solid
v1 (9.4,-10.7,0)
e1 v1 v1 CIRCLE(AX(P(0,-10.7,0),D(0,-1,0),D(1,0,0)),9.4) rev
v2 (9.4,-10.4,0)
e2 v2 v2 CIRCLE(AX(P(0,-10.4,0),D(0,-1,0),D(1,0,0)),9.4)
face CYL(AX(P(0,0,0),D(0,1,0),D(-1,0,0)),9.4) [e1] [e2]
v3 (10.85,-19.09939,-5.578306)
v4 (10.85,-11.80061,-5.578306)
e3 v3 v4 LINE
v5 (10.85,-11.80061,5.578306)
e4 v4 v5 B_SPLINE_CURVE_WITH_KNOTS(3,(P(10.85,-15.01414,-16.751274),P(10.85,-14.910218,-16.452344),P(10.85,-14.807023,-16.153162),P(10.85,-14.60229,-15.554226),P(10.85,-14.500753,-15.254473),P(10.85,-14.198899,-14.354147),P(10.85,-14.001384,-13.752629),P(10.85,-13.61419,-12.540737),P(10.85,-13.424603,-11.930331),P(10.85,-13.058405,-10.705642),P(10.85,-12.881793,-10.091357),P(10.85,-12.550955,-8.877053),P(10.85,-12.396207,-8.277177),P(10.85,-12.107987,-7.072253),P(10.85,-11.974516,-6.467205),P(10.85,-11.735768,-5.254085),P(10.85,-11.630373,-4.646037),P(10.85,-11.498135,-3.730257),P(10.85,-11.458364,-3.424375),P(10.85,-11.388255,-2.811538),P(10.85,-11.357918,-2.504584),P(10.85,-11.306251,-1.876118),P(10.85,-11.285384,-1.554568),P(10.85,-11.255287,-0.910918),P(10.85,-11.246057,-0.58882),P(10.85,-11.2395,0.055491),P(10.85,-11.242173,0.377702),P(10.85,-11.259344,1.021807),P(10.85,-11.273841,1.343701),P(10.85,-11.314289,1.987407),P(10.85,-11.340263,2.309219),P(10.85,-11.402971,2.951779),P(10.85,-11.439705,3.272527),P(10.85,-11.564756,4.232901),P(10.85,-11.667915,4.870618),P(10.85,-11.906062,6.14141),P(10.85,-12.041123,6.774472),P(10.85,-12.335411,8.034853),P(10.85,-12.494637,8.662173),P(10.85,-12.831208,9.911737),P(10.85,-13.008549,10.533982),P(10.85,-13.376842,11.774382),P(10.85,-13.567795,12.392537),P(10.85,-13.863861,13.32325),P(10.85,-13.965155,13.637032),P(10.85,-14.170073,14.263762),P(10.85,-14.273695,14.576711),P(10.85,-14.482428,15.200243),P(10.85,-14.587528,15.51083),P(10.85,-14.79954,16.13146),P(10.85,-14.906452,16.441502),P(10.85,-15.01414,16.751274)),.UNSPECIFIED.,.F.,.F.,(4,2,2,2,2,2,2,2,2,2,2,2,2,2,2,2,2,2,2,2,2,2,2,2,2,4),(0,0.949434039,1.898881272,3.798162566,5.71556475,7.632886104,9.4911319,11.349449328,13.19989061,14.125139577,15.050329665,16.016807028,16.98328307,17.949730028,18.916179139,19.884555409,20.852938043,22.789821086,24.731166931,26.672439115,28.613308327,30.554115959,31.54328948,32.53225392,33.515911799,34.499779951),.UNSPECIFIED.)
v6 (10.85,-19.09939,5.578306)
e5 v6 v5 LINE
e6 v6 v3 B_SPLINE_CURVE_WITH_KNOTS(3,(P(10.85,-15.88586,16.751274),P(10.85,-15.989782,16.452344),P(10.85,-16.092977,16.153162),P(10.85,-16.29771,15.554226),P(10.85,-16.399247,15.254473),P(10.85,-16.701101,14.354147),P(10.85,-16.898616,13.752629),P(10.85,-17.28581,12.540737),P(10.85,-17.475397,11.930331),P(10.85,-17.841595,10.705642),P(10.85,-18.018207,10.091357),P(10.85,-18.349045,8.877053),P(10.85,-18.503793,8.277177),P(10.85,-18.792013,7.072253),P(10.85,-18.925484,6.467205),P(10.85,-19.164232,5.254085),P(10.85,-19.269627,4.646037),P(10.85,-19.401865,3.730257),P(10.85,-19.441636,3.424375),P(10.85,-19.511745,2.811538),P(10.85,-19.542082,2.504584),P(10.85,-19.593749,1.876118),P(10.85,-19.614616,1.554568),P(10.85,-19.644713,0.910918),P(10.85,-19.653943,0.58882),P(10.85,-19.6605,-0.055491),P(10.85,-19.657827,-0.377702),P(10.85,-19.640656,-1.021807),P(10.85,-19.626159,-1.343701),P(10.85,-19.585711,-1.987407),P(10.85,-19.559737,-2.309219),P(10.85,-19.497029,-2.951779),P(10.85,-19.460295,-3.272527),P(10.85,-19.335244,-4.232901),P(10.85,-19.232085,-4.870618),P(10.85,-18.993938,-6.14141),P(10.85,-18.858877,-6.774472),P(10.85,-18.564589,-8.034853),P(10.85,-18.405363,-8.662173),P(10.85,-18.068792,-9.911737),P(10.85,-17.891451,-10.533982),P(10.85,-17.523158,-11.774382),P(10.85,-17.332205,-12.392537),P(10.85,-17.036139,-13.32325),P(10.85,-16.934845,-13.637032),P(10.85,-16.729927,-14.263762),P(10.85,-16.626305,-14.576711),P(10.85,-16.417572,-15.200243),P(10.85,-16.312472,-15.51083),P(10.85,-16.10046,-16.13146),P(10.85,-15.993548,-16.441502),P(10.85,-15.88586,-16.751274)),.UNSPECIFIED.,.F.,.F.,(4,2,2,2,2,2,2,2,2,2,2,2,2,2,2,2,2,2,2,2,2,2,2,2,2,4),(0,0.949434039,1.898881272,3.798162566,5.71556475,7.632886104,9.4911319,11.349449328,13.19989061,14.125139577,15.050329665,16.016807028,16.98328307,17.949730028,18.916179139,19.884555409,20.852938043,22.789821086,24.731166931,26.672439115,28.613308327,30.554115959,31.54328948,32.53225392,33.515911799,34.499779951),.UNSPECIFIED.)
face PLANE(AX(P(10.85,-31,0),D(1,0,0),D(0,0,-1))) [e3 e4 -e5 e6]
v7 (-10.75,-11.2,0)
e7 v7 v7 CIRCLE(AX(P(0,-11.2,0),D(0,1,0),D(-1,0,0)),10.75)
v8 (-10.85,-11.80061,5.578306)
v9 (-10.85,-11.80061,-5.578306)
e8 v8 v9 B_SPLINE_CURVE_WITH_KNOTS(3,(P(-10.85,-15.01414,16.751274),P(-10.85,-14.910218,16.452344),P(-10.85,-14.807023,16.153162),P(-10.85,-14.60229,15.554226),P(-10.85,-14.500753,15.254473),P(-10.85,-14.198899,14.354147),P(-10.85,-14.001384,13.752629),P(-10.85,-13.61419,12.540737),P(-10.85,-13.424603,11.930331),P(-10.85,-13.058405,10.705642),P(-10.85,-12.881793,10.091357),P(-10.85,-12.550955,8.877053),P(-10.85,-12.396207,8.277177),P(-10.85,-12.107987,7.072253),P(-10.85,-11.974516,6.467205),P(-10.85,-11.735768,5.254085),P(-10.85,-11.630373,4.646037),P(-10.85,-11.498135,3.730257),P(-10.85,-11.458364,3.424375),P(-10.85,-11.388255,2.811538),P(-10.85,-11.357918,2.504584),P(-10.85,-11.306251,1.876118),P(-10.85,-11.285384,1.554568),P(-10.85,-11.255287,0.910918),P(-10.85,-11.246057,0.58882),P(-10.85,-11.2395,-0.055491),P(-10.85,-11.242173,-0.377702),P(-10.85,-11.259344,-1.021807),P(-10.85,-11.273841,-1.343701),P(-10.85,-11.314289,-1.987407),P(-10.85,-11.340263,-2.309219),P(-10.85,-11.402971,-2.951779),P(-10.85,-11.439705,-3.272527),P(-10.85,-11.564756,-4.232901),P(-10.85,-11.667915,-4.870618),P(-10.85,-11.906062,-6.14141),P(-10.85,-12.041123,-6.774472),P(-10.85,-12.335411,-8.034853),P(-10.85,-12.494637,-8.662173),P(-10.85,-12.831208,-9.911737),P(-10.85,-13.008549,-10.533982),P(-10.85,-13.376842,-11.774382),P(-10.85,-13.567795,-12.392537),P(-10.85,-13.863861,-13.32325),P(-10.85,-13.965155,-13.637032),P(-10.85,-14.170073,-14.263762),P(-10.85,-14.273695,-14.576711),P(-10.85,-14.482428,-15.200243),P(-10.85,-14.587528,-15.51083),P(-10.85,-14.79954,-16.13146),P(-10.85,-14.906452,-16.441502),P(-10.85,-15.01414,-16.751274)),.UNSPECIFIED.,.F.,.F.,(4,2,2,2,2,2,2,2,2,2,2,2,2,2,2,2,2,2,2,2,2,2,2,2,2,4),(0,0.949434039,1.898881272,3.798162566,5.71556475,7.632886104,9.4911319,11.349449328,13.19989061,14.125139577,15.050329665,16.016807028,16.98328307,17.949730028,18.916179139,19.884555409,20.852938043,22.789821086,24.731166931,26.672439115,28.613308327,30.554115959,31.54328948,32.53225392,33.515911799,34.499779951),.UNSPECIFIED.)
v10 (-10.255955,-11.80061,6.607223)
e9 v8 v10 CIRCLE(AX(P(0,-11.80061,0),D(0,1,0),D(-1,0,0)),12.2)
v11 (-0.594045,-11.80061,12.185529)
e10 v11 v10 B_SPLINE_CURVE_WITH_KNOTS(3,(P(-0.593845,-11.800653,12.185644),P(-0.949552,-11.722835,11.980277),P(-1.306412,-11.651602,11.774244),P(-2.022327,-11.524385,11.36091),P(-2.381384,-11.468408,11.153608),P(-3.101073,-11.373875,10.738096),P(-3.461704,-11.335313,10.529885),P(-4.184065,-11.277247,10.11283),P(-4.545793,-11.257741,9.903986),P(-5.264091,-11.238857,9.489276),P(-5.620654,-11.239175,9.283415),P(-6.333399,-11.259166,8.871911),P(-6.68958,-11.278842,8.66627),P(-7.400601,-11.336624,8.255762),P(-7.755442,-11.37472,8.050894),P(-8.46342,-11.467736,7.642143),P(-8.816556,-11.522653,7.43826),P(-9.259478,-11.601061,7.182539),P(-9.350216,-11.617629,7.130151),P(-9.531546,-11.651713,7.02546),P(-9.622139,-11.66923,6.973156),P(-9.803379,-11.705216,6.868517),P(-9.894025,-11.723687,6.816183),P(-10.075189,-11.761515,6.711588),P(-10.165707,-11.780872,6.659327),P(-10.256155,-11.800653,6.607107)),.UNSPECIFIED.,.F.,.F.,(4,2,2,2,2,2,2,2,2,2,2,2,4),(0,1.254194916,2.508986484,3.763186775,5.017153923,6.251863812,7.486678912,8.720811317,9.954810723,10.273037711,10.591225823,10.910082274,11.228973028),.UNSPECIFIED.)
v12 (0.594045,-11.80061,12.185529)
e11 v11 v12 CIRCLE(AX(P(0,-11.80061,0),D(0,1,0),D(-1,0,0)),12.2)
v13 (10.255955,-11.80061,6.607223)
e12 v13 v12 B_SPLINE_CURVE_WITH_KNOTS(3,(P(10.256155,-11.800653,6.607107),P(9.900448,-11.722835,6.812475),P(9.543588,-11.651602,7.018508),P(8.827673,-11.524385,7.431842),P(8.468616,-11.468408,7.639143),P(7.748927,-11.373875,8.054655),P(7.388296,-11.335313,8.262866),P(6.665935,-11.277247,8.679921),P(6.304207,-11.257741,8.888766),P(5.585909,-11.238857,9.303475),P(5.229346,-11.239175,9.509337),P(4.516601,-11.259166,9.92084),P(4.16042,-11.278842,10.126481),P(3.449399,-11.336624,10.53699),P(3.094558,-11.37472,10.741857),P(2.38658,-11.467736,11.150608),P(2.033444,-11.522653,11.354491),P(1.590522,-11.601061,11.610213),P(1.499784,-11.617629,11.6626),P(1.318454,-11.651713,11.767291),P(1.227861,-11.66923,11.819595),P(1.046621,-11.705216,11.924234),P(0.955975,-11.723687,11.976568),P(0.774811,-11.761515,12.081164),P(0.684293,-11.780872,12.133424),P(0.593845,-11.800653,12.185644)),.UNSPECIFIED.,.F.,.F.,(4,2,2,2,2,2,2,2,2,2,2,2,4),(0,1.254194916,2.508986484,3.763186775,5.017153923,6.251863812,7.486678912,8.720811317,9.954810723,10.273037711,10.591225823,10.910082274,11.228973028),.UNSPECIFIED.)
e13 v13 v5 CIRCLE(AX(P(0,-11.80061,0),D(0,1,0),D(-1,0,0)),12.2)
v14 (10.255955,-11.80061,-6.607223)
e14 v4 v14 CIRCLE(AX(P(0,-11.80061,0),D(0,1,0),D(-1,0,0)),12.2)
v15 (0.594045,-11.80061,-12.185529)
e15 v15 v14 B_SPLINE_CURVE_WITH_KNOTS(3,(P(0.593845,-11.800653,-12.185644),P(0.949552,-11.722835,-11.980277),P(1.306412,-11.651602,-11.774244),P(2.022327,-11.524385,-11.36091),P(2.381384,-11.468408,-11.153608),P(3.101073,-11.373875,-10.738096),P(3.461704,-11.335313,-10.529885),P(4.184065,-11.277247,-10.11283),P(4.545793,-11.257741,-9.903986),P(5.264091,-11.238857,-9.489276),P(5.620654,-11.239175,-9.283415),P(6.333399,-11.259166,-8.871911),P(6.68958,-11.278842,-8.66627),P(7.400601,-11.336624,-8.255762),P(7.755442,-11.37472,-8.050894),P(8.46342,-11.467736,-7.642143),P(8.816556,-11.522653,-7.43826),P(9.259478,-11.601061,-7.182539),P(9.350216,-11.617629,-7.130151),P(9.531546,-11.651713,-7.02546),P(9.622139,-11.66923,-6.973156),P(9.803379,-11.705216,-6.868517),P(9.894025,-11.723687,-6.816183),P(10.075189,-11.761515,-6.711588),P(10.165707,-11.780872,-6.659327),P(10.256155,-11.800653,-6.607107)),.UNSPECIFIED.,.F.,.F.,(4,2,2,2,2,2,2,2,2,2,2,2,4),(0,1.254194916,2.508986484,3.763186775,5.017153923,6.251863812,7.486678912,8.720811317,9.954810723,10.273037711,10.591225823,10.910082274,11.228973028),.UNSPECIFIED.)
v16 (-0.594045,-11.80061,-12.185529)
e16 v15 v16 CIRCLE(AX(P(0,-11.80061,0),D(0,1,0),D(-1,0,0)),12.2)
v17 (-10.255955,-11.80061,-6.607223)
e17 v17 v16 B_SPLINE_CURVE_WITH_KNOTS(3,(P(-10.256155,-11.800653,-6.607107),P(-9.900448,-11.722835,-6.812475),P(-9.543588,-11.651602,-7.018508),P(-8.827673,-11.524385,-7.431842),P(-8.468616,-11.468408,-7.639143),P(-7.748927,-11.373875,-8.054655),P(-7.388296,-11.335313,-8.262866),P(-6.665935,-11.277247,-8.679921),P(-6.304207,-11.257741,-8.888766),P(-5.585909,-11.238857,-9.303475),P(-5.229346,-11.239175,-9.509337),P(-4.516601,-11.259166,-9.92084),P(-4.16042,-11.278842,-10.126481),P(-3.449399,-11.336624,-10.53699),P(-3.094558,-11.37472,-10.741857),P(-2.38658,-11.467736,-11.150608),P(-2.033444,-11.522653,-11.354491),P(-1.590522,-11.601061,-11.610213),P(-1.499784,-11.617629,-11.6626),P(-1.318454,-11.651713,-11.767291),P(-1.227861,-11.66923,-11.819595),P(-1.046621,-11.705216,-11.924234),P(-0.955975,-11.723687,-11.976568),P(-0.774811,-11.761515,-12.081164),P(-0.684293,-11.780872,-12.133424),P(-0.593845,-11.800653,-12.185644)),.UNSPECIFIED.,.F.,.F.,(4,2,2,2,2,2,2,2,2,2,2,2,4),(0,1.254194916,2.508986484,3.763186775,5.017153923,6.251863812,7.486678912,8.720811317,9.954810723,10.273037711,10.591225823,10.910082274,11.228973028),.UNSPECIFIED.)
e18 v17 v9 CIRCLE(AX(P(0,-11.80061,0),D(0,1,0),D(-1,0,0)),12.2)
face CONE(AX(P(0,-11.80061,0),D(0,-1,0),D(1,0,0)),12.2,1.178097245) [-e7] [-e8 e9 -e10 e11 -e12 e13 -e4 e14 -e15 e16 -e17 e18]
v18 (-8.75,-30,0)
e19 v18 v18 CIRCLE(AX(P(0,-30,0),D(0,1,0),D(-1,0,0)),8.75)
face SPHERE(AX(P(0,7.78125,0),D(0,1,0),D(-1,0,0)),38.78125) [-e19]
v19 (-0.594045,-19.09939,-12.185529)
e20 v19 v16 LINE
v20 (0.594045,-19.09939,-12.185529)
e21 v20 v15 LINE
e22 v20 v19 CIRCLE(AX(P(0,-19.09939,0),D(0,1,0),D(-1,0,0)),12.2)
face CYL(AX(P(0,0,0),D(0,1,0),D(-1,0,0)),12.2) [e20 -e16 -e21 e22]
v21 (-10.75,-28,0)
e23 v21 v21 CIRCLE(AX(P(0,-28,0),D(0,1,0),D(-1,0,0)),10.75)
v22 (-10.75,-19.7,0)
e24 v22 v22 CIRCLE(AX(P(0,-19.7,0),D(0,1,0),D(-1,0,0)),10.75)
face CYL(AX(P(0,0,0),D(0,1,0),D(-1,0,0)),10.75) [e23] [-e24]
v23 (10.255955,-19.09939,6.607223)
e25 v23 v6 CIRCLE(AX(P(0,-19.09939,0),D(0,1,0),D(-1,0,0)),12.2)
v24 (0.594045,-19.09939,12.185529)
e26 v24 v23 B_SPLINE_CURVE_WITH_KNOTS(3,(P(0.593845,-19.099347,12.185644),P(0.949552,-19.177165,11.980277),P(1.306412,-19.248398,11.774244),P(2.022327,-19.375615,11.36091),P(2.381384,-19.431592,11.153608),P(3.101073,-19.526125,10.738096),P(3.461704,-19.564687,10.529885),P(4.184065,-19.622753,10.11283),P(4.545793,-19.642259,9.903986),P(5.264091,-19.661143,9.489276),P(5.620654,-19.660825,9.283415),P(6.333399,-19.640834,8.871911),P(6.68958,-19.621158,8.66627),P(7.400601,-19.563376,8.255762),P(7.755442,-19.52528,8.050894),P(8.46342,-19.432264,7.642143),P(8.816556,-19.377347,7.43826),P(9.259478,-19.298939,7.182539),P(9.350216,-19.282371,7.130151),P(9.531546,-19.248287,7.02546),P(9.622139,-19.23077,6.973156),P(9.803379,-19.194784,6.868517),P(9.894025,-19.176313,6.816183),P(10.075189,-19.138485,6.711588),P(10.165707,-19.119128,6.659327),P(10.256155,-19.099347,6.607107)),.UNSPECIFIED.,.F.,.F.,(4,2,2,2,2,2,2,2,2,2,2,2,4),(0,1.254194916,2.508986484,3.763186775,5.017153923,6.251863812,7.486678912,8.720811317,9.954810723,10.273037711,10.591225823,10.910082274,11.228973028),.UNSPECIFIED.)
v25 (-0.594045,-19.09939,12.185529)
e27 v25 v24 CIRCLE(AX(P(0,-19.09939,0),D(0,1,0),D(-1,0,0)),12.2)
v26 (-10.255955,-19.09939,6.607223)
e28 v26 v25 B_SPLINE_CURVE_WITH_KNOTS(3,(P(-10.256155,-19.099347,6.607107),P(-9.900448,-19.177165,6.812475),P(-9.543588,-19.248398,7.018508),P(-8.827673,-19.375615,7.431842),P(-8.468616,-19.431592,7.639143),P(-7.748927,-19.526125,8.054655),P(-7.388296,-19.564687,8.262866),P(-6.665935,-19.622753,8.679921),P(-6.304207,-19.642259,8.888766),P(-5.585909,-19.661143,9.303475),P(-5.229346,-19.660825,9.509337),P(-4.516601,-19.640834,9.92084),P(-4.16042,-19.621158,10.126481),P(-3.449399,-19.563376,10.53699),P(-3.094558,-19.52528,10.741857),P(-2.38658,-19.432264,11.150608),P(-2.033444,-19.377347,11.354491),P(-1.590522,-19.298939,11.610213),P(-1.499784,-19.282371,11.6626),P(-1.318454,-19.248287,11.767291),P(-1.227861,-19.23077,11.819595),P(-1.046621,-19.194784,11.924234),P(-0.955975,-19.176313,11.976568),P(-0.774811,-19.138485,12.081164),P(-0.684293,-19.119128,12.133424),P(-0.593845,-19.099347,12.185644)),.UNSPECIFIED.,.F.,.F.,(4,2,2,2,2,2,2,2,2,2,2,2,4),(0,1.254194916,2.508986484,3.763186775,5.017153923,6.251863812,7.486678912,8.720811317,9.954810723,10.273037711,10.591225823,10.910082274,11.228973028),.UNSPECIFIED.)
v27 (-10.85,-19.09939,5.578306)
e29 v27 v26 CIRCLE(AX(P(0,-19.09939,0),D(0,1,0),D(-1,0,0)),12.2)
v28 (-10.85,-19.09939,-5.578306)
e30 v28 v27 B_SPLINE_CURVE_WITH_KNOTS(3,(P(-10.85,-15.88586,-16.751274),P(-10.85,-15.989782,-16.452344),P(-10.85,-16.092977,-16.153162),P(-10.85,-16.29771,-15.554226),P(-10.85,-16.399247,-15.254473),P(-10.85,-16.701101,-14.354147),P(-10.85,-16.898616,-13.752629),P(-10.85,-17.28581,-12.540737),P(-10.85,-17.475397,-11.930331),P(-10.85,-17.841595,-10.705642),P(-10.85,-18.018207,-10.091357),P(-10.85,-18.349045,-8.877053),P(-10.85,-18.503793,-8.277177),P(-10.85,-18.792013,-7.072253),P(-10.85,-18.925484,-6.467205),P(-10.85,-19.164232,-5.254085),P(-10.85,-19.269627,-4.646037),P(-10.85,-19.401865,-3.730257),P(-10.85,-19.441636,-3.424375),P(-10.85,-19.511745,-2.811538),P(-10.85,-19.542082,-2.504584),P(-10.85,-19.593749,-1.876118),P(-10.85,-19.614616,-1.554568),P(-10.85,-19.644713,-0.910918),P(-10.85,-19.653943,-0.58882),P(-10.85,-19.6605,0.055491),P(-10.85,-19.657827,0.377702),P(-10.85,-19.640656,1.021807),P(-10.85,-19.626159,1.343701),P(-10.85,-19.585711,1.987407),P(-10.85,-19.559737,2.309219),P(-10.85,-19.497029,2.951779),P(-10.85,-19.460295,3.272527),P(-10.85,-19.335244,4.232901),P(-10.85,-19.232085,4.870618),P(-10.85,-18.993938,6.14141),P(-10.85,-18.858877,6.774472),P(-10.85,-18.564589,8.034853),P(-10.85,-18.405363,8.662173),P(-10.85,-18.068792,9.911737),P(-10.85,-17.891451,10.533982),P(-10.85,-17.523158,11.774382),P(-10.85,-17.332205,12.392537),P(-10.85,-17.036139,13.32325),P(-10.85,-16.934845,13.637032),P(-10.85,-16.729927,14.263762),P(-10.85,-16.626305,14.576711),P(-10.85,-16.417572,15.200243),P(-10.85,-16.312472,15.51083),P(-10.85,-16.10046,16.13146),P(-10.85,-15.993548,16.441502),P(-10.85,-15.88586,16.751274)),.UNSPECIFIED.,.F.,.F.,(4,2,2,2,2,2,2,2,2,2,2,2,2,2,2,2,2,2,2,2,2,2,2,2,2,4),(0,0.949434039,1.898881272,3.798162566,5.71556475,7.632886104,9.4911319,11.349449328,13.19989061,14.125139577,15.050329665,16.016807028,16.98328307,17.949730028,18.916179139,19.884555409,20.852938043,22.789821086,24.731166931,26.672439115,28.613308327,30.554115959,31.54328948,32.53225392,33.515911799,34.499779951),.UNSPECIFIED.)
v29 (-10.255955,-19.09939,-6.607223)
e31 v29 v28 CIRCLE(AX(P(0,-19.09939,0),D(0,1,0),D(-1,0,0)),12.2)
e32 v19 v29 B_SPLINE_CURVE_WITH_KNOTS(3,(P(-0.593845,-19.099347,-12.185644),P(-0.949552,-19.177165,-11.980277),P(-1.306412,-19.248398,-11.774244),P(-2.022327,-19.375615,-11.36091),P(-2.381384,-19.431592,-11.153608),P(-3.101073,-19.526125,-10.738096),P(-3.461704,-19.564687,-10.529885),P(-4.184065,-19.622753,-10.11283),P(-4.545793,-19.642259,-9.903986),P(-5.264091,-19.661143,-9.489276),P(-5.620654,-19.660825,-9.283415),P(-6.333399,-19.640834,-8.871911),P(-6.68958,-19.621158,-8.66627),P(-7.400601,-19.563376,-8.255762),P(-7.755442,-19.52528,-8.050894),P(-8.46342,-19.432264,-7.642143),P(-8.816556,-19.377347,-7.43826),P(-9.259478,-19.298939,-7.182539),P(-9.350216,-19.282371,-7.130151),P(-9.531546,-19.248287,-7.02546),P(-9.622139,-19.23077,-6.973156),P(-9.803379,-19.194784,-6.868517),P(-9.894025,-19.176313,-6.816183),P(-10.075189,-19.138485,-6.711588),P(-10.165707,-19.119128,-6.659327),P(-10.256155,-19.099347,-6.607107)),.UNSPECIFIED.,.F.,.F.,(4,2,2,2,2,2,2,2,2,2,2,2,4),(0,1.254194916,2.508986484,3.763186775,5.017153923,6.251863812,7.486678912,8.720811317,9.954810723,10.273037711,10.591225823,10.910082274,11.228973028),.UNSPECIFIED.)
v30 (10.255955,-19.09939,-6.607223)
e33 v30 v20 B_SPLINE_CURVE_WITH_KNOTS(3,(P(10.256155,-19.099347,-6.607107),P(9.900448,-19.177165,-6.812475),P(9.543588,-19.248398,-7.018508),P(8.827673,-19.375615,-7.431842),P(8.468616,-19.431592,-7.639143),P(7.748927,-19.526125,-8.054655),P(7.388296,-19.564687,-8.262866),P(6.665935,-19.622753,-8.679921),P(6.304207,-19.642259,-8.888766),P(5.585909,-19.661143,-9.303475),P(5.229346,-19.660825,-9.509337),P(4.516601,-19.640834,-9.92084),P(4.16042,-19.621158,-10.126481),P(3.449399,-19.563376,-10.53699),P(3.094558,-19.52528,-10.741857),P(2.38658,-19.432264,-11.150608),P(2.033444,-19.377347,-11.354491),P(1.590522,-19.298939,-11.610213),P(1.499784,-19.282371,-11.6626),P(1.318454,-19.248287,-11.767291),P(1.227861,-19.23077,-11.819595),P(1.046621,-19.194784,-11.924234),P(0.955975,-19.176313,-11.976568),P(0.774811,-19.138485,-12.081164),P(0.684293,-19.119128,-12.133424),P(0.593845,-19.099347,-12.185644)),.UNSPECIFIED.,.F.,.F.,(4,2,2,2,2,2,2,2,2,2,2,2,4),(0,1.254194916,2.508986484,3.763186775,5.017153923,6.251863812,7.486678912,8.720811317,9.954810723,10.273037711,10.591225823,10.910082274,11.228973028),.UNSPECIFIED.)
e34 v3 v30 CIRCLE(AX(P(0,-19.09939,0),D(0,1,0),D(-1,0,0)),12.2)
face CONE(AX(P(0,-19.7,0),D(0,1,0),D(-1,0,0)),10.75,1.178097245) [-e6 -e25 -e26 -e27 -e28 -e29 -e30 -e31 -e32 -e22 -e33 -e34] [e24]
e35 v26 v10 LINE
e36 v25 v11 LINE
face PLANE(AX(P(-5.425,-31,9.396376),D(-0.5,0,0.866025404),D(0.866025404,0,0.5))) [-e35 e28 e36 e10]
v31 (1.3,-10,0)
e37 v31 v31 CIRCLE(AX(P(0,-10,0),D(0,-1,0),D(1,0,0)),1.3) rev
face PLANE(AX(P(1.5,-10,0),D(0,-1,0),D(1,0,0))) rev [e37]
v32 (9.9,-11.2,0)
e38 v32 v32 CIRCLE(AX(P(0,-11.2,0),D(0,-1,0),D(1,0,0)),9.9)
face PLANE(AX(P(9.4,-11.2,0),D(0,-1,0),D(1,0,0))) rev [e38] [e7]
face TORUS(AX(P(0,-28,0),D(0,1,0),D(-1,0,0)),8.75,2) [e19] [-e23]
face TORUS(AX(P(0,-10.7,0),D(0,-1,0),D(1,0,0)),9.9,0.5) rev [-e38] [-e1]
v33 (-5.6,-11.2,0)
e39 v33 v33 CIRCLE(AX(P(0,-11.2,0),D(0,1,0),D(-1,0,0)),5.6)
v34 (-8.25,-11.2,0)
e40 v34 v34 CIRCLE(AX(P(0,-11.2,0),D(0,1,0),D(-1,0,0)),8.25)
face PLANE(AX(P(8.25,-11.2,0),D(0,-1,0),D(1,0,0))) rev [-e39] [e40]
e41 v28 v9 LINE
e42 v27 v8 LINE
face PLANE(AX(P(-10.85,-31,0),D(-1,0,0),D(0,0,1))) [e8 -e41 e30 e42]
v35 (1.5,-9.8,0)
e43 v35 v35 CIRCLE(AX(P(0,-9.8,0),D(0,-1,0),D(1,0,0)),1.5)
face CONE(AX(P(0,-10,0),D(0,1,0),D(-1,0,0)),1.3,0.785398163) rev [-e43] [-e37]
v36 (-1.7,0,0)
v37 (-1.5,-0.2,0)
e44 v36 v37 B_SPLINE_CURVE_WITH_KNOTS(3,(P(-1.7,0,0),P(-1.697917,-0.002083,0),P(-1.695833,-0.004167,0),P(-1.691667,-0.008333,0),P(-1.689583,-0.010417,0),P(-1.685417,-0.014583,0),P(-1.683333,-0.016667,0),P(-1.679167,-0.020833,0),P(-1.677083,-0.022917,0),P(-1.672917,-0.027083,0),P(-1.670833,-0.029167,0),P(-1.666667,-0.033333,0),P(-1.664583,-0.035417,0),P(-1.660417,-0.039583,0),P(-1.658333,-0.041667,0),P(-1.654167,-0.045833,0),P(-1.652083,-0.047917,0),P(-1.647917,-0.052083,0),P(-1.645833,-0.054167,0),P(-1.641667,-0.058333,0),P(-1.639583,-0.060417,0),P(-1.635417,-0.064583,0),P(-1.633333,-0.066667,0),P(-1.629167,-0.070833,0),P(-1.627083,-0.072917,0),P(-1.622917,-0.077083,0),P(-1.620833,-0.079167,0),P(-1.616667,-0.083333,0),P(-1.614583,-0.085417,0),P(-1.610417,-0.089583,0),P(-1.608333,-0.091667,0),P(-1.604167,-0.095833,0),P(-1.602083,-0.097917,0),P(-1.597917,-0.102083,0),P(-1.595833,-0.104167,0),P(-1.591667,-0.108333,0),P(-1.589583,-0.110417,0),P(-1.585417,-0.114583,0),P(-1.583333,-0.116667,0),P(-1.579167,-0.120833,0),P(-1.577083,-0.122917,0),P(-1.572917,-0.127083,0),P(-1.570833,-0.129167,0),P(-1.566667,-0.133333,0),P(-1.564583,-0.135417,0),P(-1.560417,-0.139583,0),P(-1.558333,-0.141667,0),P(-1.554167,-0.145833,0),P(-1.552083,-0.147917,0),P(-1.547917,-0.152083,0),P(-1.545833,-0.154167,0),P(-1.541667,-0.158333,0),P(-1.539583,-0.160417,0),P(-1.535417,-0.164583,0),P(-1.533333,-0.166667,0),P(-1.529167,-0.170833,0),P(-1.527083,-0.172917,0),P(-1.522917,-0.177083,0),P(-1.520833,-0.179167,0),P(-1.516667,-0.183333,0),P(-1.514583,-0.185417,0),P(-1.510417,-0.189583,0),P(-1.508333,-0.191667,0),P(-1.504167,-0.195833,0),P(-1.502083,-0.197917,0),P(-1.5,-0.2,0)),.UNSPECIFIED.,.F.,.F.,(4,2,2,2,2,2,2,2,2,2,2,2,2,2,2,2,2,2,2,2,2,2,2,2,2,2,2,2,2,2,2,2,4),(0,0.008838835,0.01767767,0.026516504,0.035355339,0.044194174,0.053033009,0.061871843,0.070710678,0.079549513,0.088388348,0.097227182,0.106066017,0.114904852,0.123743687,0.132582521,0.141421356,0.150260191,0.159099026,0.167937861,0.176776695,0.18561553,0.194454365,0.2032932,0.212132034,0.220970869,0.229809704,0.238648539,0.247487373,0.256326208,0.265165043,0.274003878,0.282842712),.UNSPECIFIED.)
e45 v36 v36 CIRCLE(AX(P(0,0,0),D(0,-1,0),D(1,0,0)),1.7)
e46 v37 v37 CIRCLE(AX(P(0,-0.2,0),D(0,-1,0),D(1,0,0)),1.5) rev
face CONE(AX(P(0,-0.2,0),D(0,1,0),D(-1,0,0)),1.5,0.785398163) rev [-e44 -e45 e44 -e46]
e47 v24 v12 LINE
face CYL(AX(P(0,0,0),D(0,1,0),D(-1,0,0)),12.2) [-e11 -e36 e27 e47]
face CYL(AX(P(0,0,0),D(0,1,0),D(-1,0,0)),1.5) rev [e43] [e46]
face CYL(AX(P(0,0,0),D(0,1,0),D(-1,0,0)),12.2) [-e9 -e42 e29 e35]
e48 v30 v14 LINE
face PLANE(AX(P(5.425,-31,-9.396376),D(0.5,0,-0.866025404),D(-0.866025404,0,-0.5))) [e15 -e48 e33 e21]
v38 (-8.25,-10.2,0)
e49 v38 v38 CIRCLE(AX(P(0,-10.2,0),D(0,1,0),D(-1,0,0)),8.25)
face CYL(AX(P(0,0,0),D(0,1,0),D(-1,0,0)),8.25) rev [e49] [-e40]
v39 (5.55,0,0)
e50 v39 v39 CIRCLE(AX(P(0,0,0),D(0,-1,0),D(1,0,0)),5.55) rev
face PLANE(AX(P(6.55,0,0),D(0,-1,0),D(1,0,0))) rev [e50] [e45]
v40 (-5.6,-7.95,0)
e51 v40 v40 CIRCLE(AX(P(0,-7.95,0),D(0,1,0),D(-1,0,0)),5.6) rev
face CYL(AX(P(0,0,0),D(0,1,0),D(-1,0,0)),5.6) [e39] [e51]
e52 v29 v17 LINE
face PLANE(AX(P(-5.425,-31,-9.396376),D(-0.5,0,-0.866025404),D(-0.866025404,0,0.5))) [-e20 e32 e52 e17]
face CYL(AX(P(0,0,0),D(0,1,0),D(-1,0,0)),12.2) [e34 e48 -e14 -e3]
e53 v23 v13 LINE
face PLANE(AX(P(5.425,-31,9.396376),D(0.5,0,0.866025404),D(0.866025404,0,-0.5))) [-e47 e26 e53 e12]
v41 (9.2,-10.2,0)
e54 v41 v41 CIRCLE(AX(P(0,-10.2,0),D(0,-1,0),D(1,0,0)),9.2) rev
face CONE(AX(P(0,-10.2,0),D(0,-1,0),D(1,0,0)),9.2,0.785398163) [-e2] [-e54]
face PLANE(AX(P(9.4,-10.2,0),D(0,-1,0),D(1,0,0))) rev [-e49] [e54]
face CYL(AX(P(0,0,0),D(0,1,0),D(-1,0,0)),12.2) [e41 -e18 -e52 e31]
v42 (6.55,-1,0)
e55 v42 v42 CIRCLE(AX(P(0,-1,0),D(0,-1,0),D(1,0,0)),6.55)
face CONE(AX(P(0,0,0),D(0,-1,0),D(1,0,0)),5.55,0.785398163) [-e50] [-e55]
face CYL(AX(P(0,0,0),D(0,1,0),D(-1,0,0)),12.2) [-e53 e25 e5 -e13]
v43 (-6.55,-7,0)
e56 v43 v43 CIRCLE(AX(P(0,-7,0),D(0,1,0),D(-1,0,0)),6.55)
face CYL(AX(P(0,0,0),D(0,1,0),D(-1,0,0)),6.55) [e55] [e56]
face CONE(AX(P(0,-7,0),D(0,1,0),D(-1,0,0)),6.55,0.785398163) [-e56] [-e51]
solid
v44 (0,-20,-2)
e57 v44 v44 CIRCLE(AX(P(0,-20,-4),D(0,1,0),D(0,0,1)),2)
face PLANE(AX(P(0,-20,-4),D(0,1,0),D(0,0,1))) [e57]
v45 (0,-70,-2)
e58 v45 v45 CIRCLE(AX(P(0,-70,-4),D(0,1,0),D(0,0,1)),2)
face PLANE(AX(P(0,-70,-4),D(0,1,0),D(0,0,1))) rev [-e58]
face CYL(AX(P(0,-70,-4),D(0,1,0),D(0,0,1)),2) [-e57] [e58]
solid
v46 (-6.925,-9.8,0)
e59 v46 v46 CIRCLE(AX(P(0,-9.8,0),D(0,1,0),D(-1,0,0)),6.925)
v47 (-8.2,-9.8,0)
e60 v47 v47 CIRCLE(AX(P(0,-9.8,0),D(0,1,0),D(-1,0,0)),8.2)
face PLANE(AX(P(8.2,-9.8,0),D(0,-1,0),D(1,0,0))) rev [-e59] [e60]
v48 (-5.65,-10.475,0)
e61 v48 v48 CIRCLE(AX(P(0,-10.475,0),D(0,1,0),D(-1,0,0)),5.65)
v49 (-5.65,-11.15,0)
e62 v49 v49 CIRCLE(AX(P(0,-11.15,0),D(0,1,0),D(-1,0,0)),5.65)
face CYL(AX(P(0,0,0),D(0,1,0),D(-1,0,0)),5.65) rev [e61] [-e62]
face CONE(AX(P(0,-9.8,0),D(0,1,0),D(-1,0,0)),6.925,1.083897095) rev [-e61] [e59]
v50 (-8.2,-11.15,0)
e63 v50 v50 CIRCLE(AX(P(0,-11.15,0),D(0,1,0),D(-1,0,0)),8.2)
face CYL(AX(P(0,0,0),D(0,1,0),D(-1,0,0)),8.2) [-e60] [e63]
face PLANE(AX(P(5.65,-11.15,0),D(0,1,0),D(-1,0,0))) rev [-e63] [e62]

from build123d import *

# Parameters (mm, degrees)
CUT_EXTRUDE2_DEPTH  = 36.477880433
FILLET1_R           = 2
CHAMFER1_SIZE       = 1
CHAMFER2_SIZE       = 0.2
FILLET2_R           = 0.5
BOSS_EXTRUDE1_START = -20
SKETCH5_R           = 2
BOSS_EXTRUDE1_DEPTH = 50


# Some blends are built 0.0001 mm under size
with BuildPart() as part:
    # Sketch1 → Revolve1 (revolve)
    with BuildSketch(Plane.XY, mode=Mode.PRIVATE) as revolve1_sk:
        with BuildLine():
            Line((10.75, -30), (10.75, -19.7))
            Line((10.75, -19.7), (12.2, -19.099390335))
            Line((12.2, -19.099390335), (12.2, -11.800609665))
            Line((12.2, -11.800609665), (10.75, -11.2))
            Line((10.75, -11.2), (9.4, -11.2))
            Line((9.4, -11.2), (9.4, -10.2))
            Line((9.4, -10.2), (8.25, -10.2))
            Line((8.25, -10.2), (8.25, -11.2))
            Line((8.25, -11.2), (5.6, -11.2))
            Line((5.6, -11.2), (5.6, -8))
            Line((5.6, -8), (6.55, -8))
            Line((6.55, -8), (6.55, 0))
            Line((6.55, 0), (1.5, 0))
            Line((1.5, 0), (1.5, -10))
            Line((1.5, -10), (0, -10))
            Line((0, -10), (0, -31))
            ThreePointArc((0, -31), (4.403478738, -30.749188961), (8.75, -30))
            Line((8.75, -30), (10.75, -30))
        make_face()
        Polygon((5.65, -11.15), (8.2, -11.15), (8.2, -9.8), (6.925, -9.8), (5.65, -10.475), align=None)
    revolve(revolve1_sk.sketch.rotate(Axis((0, 0, 0), (0, -1, 0)), 180), axis=Axis((0, 0, 0), (0, -1, 0)))

    # Sketch2 → Cut-Extrude2 (cut, through all)
    with BuildSketch(Plane(origin=(0, 0, 0), x_dir=(1, 0, 0), z_dir=(0, 1, 0))):
        with BuildLine():
            Line((-10.255954875, 6.607222534), (-0.594045125, 12.185528728))
            ThreePointArc((-0.594045125, 12.185528728), (-6.1, 10.565509926), (-10.255954875, 6.607222534))
        make_face()
        with BuildLine():
            ThreePointArc((10.255954875, 6.607222534), (6.1, 10.565509926), (0.594045125, 12.185528728))
            Line((0.594045125, 12.185528728), (10.255954875, 6.607222534))
        make_face()
        with BuildLine():
            ThreePointArc((12.2, 0), (11.857697922, 2.86966897), (10.85, 5.578306195))
            Line((10.85, 5.578306195), (10.85, -5.578306195))
            ThreePointArc((10.85, -5.578306195), (11.857697922, -2.86966897), (12.2, 0))
        make_face()
        with BuildLine():
            ThreePointArc((0.594045125, -12.185528728), (6.1, -10.565509926), (10.255954875, -6.607222534))
            Line((10.255954875, -6.607222534), (0.594045125, -12.185528728))
        make_face()
        with BuildLine():
            Line((-0.594045125, -12.185528728), (-10.255954875, -6.607222534))
            ThreePointArc((-10.255954875, -6.607222534), (-6.1, -10.565509926), (-0.594045125, -12.185528728))
        make_face()
        with BuildLine():
            Line((-10.85, -5.578306195), (-10.85, 5.578306195))
            ThreePointArc((-10.85, 5.578306195), (-12.2, 0), (-10.85, -5.578306195))
        make_face()
    extrude(amount=-CUT_EXTRUDE2_DEPTH, mode=Mode.SUBTRACT)

    # Fillet1
    fillet1_edges = [part.edges().sort_by_distance(p)[0] for p in [
        (10.75, -30, 0),
    ]]
    fillet(fillet1_edges, radius=FILLET1_R - 0.0001)  # a hair under: the kernel refuses the full size

    # Chamfer1
    # the kernel refuses this chamfer: 1 mm, written as the material it takes off along each edge
    with BuildSketch(Plane(origin=(0, -8, 0), x_dir=(-1, 0, 0), z_dir=(0, 0, 1))) as chamfer1_piece_1_section:
        Polygon((6.55 - CHAMFER1_SIZE, 0), (6.55, -CHAMFER1_SIZE), (6.55, 0), align=None)
    chamfer1_piece_1 = revolve(axis=Axis((0, -8, 0), (0, -1, 0)), mode=Mode.PRIVATE)
    chamfer1_piece_1 = chamfer1_piece_1 - Plane(origin=(0, -7.480474421, 0), x_dir=(-1, 0, 0), z_dir=(0, 1, 0)) * Cylinder(5.6, 27, mode=Mode.PRIVATE)
    add(chamfer1_piece_1, mode=Mode.SUBTRACT)
    with BuildSketch(Plane(origin=(0, 0, 0), x_dir=(-1, 0, 0), z_dir=(0, 0, 1))) as chamfer1_piece_2:
        Polygon((6.55, CHAMFER1_SIZE), (6.55 - CHAMFER1_SIZE, 0), (6.55, 0), align=None)
    revolve(axis=Axis((0, 0, 0), (0, -1, 0)), mode=Mode.SUBTRACT)

    # Chamfer2
    chamfer2_edges = [part.edges().sort_by_distance(p)[0] for p in [
        (9.4, -10.2, 0),
        (1.5, 0, 0),
        (1.5, -10, 0),
    ]]
    chamfer(chamfer2_edges, length=CHAMFER2_SIZE)

    # Fillet2
    fillet2_edges = [part.edges().sort_by_distance(p)[0] for p in [
        (9.4, -11.2, 0),
    ]]
    fillet(fillet2_edges, radius=FILLET2_R)


with BuildPart() as body_2:
    # Sketch5 → Boss-Extrude1 (new body)
    with BuildSketch(Plane(origin=(0, 0, 0), x_dir=(1, 0, 0), z_dir=(0, 1, 0)).offset(BOSS_EXTRUDE1_START)):
        with Locations(Location((0, 4, 0), (0, 0, 270))):
            Circle(SKETCH5_R)
    extrude(amount=-BOSS_EXTRUDE1_DEPTH)


solid = Compound([part.part, body_2.part])
